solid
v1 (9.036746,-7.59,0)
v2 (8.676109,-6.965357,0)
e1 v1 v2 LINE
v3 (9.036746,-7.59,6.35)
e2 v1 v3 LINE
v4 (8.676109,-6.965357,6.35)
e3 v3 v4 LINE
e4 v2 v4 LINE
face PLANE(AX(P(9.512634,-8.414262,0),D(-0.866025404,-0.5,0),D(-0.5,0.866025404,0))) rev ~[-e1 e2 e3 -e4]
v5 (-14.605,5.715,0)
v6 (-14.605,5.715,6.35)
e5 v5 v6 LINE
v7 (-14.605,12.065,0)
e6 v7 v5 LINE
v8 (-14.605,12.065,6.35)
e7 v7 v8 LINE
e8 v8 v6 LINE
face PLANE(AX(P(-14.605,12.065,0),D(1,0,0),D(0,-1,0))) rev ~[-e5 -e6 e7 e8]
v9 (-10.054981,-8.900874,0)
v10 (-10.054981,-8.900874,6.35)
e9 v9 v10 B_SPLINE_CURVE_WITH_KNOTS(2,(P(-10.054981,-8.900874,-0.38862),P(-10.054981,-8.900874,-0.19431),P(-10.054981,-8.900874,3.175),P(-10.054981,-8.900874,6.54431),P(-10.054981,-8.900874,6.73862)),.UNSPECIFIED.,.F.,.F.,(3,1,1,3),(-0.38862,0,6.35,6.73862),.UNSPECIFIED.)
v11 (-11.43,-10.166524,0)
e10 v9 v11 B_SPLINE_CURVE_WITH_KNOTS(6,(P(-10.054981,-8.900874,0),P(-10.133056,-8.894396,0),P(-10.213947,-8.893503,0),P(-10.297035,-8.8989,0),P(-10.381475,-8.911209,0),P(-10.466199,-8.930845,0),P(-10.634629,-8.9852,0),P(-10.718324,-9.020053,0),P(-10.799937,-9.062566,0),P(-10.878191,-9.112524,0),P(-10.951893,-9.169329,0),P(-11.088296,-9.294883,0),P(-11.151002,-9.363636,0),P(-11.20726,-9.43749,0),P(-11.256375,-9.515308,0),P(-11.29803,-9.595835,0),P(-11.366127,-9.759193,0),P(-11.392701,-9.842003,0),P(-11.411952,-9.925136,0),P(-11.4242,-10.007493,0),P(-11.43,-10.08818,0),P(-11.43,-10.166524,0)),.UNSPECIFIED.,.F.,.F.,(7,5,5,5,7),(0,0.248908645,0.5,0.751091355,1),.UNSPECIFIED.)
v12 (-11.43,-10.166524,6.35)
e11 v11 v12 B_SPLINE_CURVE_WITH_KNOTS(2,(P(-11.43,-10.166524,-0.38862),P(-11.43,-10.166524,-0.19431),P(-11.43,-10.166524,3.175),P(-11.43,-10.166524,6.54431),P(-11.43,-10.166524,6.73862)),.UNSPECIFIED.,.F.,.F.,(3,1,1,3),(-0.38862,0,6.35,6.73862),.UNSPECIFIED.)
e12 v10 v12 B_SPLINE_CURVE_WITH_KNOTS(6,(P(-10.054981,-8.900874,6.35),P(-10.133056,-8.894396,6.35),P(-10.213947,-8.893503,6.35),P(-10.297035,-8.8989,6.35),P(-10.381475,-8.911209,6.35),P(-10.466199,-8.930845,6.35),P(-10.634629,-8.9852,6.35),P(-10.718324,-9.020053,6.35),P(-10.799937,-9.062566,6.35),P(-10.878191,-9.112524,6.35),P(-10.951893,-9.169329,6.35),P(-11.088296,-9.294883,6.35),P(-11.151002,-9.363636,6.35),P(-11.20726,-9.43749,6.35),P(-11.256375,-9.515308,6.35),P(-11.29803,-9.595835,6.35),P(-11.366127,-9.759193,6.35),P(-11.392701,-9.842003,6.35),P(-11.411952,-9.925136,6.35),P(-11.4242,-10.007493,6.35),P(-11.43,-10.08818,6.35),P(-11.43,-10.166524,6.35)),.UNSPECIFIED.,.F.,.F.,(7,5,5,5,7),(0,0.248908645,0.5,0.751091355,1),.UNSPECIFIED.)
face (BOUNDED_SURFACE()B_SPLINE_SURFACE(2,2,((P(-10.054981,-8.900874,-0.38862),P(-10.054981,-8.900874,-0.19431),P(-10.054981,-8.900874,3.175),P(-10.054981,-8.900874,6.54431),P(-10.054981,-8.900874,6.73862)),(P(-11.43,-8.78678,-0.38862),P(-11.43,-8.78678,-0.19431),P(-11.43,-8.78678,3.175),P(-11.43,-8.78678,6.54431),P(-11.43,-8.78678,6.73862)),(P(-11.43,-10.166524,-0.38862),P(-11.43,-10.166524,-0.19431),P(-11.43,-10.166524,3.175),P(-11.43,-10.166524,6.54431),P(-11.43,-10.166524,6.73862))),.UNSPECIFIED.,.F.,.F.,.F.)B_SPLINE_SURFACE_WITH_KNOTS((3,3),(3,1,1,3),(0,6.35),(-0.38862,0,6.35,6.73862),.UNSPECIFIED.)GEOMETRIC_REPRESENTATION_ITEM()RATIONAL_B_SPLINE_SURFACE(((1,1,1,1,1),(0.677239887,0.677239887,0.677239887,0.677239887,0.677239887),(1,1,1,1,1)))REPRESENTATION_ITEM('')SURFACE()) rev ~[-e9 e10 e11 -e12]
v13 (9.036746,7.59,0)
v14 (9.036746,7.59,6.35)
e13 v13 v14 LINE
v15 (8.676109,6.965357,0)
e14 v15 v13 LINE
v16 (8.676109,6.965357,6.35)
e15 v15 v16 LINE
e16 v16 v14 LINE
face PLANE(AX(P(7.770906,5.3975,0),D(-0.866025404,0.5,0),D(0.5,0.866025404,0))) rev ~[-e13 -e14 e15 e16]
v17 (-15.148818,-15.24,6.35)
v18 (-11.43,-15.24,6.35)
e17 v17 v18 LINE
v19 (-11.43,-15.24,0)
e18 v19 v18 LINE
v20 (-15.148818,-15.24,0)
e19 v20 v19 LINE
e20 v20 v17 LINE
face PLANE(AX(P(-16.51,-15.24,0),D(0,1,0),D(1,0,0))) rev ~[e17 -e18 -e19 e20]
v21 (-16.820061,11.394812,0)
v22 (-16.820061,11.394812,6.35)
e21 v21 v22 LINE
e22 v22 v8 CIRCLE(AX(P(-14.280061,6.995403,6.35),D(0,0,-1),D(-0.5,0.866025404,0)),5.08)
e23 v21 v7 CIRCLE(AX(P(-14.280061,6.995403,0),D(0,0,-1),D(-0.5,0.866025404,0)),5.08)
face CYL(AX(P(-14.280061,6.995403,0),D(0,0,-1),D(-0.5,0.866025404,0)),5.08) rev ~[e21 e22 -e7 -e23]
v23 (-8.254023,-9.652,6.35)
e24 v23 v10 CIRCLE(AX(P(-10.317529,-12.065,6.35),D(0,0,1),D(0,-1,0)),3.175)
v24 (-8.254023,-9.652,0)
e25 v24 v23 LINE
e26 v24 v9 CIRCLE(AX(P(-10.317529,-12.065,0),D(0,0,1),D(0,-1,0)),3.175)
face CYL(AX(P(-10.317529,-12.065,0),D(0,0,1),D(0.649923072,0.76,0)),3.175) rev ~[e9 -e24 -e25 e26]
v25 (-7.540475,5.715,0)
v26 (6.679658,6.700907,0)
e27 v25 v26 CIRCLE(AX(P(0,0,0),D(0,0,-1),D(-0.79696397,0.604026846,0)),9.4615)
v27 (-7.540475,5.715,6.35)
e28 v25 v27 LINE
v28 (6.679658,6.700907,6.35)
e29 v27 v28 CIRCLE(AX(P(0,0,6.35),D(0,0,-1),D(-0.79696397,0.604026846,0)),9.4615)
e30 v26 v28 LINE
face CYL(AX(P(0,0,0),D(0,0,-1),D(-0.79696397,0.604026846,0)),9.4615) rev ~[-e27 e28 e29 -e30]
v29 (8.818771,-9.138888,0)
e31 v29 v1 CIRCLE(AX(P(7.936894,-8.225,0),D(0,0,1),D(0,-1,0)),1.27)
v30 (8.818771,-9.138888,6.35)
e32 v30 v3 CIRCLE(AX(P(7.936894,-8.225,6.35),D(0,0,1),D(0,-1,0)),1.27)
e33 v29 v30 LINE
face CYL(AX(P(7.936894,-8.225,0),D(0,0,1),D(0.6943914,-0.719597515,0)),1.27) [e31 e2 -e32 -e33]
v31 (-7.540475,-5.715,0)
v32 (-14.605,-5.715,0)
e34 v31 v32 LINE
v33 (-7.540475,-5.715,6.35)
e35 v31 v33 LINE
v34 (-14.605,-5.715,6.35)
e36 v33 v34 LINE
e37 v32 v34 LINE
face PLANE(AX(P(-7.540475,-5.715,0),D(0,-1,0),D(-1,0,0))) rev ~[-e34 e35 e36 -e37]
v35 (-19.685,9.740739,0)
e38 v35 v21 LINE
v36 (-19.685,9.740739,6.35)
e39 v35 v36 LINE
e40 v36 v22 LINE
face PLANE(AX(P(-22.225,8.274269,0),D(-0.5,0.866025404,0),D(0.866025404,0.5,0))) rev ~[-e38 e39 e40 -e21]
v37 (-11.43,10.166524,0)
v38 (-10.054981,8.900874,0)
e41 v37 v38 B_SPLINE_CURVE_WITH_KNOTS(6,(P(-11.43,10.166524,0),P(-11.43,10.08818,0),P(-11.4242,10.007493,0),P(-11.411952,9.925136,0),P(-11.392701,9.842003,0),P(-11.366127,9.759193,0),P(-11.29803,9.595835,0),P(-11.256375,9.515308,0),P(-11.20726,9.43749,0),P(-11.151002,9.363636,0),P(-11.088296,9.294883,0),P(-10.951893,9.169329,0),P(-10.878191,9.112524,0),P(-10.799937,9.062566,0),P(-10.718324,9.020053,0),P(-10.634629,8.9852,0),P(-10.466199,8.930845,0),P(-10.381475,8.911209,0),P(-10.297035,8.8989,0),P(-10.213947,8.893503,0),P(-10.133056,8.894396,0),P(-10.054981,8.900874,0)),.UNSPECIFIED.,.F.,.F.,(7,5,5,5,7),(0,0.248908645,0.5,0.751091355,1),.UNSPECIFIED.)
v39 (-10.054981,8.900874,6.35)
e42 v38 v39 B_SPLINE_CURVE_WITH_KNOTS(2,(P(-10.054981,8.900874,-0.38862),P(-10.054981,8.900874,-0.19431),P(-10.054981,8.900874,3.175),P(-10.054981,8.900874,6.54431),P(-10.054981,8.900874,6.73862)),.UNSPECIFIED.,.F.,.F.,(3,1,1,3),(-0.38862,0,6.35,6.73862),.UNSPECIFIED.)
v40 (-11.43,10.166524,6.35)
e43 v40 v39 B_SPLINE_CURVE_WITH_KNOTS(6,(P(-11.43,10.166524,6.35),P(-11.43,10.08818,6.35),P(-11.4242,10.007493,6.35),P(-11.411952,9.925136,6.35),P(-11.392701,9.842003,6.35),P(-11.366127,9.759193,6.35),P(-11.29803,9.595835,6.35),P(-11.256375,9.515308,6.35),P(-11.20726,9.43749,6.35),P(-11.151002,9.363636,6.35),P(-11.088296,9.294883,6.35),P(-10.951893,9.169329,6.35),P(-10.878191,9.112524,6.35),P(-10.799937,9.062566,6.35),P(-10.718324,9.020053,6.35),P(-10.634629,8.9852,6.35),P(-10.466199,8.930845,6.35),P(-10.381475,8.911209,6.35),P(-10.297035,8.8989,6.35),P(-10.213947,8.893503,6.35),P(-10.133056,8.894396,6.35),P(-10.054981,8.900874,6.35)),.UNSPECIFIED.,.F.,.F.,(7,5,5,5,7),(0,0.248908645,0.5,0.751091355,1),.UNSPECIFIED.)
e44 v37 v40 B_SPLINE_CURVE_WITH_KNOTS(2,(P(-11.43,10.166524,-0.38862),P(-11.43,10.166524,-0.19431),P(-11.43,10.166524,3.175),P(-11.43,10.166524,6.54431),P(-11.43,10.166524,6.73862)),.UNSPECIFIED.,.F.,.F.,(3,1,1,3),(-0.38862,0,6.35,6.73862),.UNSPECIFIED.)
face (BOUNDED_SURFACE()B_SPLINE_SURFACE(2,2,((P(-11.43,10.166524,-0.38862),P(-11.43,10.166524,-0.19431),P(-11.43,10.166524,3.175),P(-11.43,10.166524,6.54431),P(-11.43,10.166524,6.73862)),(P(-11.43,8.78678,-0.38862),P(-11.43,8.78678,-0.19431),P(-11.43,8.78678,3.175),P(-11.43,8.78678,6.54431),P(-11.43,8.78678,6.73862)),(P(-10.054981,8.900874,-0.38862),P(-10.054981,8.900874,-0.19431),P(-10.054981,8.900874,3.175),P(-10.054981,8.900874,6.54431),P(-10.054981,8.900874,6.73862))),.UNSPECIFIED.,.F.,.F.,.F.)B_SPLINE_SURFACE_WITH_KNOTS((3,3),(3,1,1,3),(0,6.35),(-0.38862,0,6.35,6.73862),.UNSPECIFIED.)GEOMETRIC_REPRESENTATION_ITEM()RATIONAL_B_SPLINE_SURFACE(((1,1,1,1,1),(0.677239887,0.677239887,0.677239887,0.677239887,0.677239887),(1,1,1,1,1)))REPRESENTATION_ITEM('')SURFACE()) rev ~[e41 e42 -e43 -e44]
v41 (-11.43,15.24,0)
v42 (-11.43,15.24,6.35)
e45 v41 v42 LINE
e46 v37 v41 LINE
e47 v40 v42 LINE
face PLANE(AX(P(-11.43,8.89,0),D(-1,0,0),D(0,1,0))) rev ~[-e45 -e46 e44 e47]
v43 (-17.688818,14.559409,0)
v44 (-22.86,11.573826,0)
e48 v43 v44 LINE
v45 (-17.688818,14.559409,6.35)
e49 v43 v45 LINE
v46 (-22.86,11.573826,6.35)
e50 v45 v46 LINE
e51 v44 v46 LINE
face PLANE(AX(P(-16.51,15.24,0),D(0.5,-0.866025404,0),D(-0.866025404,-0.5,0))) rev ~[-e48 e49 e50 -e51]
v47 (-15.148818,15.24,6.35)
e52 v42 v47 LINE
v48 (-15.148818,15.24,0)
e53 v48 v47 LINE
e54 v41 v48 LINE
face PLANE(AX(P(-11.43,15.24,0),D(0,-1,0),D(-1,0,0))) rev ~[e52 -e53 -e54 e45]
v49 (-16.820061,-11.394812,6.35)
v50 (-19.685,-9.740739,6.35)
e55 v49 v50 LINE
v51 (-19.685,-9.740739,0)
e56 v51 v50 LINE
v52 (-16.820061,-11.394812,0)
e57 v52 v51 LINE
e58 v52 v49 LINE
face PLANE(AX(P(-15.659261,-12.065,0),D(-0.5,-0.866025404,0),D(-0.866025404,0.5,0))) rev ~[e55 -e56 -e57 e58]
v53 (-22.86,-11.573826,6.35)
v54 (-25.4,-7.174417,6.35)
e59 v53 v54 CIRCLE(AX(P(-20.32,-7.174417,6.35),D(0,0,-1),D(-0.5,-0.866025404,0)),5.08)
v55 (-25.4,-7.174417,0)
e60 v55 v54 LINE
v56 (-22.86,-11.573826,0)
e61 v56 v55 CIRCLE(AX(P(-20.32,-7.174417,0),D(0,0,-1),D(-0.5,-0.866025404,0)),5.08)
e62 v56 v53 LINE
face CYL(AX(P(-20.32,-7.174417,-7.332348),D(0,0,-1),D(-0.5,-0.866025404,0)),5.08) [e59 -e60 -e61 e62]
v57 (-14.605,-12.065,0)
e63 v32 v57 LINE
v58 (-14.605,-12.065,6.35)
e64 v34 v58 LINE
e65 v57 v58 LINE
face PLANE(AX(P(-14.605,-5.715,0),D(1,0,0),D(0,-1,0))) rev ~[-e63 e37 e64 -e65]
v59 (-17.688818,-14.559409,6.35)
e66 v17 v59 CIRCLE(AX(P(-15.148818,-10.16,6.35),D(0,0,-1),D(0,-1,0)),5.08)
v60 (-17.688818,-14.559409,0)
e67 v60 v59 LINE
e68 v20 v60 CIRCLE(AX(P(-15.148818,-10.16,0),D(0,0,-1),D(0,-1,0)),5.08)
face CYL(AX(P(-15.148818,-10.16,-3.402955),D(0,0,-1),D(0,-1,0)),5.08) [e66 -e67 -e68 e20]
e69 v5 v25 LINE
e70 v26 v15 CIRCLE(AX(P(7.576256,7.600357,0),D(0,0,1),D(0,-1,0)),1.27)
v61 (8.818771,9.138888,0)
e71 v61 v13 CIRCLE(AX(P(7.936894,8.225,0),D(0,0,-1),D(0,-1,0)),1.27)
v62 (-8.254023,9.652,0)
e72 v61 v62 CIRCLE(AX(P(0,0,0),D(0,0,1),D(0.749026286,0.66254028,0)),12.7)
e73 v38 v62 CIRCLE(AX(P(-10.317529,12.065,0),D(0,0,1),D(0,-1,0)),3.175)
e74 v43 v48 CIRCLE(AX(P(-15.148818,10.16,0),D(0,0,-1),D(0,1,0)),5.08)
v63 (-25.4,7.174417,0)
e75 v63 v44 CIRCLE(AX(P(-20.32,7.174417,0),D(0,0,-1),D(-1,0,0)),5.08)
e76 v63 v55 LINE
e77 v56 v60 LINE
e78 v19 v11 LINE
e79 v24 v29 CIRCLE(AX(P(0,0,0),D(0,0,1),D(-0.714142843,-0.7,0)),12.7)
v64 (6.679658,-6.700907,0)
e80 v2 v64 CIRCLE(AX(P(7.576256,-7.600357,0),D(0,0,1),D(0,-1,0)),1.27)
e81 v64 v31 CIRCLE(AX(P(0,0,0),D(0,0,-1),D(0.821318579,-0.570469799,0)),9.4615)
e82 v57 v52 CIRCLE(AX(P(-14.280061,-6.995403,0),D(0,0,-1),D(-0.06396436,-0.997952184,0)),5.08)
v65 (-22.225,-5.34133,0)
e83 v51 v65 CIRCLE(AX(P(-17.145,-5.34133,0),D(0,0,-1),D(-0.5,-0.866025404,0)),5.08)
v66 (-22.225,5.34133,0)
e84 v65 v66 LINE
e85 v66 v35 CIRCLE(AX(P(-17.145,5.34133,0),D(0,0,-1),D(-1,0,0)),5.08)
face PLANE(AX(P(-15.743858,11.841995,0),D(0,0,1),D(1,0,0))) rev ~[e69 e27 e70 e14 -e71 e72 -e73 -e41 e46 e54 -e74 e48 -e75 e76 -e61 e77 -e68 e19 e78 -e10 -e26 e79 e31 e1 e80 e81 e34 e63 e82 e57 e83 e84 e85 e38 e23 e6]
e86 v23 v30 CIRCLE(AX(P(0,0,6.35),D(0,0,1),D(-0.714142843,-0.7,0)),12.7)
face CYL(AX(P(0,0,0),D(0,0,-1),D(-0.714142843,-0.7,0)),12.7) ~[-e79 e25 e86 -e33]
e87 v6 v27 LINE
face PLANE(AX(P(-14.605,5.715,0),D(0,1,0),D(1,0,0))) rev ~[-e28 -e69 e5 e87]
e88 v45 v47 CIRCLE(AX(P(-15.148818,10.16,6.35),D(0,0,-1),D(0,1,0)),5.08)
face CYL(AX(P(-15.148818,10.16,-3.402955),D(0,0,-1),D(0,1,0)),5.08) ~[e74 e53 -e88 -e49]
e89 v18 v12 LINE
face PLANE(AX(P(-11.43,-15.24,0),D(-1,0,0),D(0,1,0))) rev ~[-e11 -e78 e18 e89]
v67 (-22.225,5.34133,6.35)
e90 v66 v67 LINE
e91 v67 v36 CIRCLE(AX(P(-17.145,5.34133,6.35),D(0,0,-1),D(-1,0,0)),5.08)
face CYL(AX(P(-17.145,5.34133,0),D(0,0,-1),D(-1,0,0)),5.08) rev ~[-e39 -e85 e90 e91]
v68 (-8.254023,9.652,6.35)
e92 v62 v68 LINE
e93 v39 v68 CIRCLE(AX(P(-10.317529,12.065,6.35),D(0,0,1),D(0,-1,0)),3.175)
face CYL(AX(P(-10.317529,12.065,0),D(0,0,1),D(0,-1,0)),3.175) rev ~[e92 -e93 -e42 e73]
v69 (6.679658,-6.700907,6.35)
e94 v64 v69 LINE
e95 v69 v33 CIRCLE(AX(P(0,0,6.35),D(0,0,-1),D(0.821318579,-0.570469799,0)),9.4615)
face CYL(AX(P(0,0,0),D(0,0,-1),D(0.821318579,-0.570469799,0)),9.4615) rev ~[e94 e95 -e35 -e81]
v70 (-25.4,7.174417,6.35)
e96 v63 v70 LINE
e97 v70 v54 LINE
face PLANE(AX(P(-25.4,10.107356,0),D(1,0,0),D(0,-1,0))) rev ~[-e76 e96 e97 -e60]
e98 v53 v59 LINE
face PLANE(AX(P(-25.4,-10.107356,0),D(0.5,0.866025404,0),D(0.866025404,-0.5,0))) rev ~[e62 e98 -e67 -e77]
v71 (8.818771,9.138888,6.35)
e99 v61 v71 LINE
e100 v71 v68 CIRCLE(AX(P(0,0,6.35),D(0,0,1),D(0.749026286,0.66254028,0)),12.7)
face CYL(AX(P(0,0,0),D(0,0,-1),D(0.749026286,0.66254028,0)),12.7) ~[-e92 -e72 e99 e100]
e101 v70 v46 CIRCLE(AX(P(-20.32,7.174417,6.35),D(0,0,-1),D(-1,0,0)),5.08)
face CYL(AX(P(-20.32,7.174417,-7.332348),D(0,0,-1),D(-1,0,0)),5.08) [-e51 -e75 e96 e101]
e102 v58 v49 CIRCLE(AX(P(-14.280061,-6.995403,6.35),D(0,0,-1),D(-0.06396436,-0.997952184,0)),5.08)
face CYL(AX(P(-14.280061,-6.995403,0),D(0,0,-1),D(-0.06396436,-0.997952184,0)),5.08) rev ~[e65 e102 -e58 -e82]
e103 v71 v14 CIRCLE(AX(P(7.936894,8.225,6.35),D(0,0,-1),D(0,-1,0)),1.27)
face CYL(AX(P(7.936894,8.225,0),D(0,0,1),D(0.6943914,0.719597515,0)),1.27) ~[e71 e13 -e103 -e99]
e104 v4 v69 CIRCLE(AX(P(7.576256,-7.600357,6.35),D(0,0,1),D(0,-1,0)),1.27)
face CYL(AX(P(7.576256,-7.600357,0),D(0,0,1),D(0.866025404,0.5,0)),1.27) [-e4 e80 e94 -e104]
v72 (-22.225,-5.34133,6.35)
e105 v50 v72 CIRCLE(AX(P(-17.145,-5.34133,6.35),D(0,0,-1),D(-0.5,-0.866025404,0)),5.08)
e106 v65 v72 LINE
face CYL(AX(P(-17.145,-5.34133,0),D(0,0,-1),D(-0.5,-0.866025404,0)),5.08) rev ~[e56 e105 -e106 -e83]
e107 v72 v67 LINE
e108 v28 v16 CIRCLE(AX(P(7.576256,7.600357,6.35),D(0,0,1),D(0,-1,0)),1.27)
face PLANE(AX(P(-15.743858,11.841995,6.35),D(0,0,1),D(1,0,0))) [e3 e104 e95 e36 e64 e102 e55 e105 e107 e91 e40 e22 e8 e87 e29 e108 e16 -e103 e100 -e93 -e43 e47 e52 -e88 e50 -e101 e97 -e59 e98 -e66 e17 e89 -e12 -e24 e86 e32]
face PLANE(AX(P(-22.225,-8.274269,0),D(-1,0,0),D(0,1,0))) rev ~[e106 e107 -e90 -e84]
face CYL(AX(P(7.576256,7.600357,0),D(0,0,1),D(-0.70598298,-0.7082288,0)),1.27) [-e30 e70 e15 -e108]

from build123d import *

# Parameters (mm, degrees)
F1_DEPTH     = 6.35
F2_T1_DEPTH  = 6.35
F2_T3_DEPTH  = 6.35
F2_T5_DEPTH  = 6.35
F2_T7_DEPTH  = 6.35
F2_T9_DEPTH  = 13.1559094878
F2_T11_DEPTH = 21.0146968374
F2_T13_DEPTH = 21.0146968374
F2_T15_DEPTH = 13.1559094878
F3_R         = 3.175
F4_R         = 1.27
F5_R         = 1.27


# Not quite as in the source:
# - a fillet or chamfer that OpenCascade refuses, or shapes differently, is made with other operations: its cross-section is extruded or revolved along the edge and cut away or added


with BuildPart() as f1:
    # F0 (on Top) → F1 (new body)
    with BuildSketch(Plane.XY):
        with BuildLine():
            ThreePointArc((7.7709057387, -5.3975), (0.1961534845, -9.4594664786), (-7.5404746038, -5.715))
            Line((-7.5404746038, -5.715), (-14.605, -5.715))
            Line((-14.605, -5.715), (-14.605, -12.065))
            Line((-14.605, -12.065), (-15.659261314, -12.065))
            Line((-15.659261314, -12.065), (-22.225, -8.2742690022))
            Line((-22.225, -8.2742690022), (-22.225, 8.2742690022))
            Line((-22.225, 8.2742690022), (-15.659261314, 12.065))
            Line((-15.659261314, 12.065), (-14.605, 12.065))
            Line((-14.605, 12.065), (-14.605, 5.715))
            Line((-14.605, 5.715), (-7.5404746038, 5.715))
            ThreePointArc((-7.5404746038, 5.715), (0.1961534845, 9.4594664786), (7.7709057387, 5.3975))
            Line((7.7709057387, 5.3975), (9.5126338349, 8.4142615555))
            ThreePointArc((9.5126338349, 8.4142615555), (0.3250359785, 12.6958399333), (-9.0696141042, 8.89))
            Line((-9.0696141042, 8.89), (-11.43, 8.89))
            Line((-11.43, 8.89), (-11.43, 15.24))
            Line((-11.43, 15.24), (-16.51, 15.24))
            Line((-16.51, 15.24), (-25.4, 10.1073561069))
            Line((-25.4, 10.1073561069), (-25.4, -10.1073561069))
            Line((-25.4, -10.1073561069), (-16.51, -15.24))
            Line((-16.51, -15.24), (-11.43, -15.24))
            Line((-11.43, -15.24), (-11.43, -8.89))
            Line((-11.43, -8.89), (-9.0696141042, -8.89))
            ThreePointArc((-9.0696141042, -8.89), (0.3250359785, -12.6958399333), (9.5126338349, -8.4142615555))
            Line((9.5126338349, -8.4142615555), (7.7709057387, -5.3975))
        make_face()
    extrude(amount=F1_DEPTH)

    # F2: fillet of radius 5.08 on 8 edges, made by hand

    # F2_s2 → F2_t1 (join)
    with BuildSketch(Plane.XY):
        with BuildLine():
            ThreePointArc((-14.605, -12.065), (-15.7512023765, -11.857721614), (-16.8200610521, -11.3948119587))
            Line((-16.8200610521, -11.3948119587), (-15.659261314, -12.065))
            Line((-15.659261314, -12.065), (-14.605, -12.065))
        make_face()
    extrude(amount=F2_T1_DEPTH)

    # F2_s4 → F2_t3 (join)
    with BuildSketch(Plane.XY):
        with BuildLine():
            ThreePointArc((-19.685, -9.740738686), (-21.5444090512, -7.8813296347), (-22.225, -5.3413296347))
            Line((-22.225, -5.3413296347), (-22.225, -8.2742690022))
            Line((-22.225, -8.2742690022), (-19.685, -9.740738686))
        make_face()
    extrude(amount=F2_T3_DEPTH)

    # F2_s6 → F2_t5 (join)
    with BuildSketch(Plane.XY):
        with BuildLine():
            ThreePointArc((-22.225, 5.3413296347), (-21.5444090512, 7.8813296347), (-19.685, 9.740738686))
            Line((-19.685, 9.740738686), (-22.225, 8.2742690022))
            Line((-22.225, 8.2742690022), (-22.225, 5.3413296347))
        make_face()
    extrude(amount=F2_T5_DEPTH)

    # F2_s8 → F2_t7 (join)
    with BuildSketch(Plane.XY):
        with BuildLine():
            ThreePointArc((-16.8200610521, 11.3948119587), (-15.7512023765, 11.857721614), (-14.605, 12.065))
            Line((-14.605, 12.065), (-15.659261314, 12.065))
            Line((-15.659261314, 12.065), (-16.8200610521, 11.3948119587))
        make_face()
    extrude(amount=F2_T7_DEPTH)

    # F2_s10 → F2_t9 (cut)
    with BuildSketch(Plane.XY.offset(-3.4029547439)):
        with BuildLine():
            ThreePointArc((-15.1488181024, 15.24), (-16.4636188516, 15.0669031975), (-17.6888181024, 14.5594090512))
            Line((-17.6888181024, 14.5594090512), (-16.51, 15.24))
            Line((-16.51, 15.24), (-15.1488181024, 15.24))
        make_face()
    extrude(amount=F2_T9_DEPTH, mode=Mode.SUBTRACT)

    # F2_s12 → F2_t11 (cut)
    with BuildSketch(Plane.XY.offset(-7.3323484187)):
        with BuildLine():
            ThreePointArc((-25.4, 7.1744167394), (-24.7194090512, 9.7144167394), (-22.86, 11.5738257906))
            Line((-22.86, 11.5738257906), (-25.4, 10.1073561069))
            Line((-25.4, 10.1073561069), (-25.4, 7.1744167394))
        make_face()
    extrude(amount=F2_T11_DEPTH, mode=Mode.SUBTRACT)

    # F2_s14 → F2_t13 (cut)
    with BuildSketch(Plane.XY.offset(-7.3323484187)):
        with BuildLine():
            ThreePointArc((-22.86, -11.5738257906), (-24.7194090512, -9.7144167394), (-25.4, -7.1744167394))
            Line((-25.4, -7.1744167394), (-25.4, -10.1073561069))
            Line((-25.4, -10.1073561069), (-22.86, -11.5738257906))
        make_face()
    extrude(amount=F2_T13_DEPTH, mode=Mode.SUBTRACT)

    # F2_s16 → F2_t15 (cut)
    with BuildSketch(Plane.XY.offset(-3.4029547439)):
        with BuildLine():
            ThreePointArc((-15.1488181024, -15.24), (-16.4636188516, -15.0669031975), (-17.6888181024, -14.5594090512))
            Line((-17.6888181024, -14.5594090512), (-16.51, -15.24))
            Line((-16.51, -15.24), (-15.1488181024, -15.24))
        make_face()
    extrude(amount=F2_T15_DEPTH, mode=Mode.SUBTRACT)

    # F3
    f3_edges = [f1.edges().sort_by_distance(p)[0] for p in [
        (-9.069614, 8.89, 3.175),
        (-9.069614, -8.89, 3.175),
    ]]
    fillet(f3_edges, radius=F3_R)

    # F4
    f4_edges = [f1.edges().sort_by_distance(p)[0] for p in [
        (-11.43, -8.89, 3.175),
        (-11.43, 8.89, 3.175),
    ]]
    fillet(f4_edges, radius=F4_R)

    # F5
    f5_edges = [f1.edges().sort_by_distance(p)[0] for p in [
        (7.770906, -5.3975, 3.175),
        (9.512634, -8.414262, 3.175),
        (9.512634, 8.414262, 3.175),
        (7.770906, 5.3975, 3.175),
    ]]
    fillet(f5_edges, radius=F5_R)


solid = f1.part
